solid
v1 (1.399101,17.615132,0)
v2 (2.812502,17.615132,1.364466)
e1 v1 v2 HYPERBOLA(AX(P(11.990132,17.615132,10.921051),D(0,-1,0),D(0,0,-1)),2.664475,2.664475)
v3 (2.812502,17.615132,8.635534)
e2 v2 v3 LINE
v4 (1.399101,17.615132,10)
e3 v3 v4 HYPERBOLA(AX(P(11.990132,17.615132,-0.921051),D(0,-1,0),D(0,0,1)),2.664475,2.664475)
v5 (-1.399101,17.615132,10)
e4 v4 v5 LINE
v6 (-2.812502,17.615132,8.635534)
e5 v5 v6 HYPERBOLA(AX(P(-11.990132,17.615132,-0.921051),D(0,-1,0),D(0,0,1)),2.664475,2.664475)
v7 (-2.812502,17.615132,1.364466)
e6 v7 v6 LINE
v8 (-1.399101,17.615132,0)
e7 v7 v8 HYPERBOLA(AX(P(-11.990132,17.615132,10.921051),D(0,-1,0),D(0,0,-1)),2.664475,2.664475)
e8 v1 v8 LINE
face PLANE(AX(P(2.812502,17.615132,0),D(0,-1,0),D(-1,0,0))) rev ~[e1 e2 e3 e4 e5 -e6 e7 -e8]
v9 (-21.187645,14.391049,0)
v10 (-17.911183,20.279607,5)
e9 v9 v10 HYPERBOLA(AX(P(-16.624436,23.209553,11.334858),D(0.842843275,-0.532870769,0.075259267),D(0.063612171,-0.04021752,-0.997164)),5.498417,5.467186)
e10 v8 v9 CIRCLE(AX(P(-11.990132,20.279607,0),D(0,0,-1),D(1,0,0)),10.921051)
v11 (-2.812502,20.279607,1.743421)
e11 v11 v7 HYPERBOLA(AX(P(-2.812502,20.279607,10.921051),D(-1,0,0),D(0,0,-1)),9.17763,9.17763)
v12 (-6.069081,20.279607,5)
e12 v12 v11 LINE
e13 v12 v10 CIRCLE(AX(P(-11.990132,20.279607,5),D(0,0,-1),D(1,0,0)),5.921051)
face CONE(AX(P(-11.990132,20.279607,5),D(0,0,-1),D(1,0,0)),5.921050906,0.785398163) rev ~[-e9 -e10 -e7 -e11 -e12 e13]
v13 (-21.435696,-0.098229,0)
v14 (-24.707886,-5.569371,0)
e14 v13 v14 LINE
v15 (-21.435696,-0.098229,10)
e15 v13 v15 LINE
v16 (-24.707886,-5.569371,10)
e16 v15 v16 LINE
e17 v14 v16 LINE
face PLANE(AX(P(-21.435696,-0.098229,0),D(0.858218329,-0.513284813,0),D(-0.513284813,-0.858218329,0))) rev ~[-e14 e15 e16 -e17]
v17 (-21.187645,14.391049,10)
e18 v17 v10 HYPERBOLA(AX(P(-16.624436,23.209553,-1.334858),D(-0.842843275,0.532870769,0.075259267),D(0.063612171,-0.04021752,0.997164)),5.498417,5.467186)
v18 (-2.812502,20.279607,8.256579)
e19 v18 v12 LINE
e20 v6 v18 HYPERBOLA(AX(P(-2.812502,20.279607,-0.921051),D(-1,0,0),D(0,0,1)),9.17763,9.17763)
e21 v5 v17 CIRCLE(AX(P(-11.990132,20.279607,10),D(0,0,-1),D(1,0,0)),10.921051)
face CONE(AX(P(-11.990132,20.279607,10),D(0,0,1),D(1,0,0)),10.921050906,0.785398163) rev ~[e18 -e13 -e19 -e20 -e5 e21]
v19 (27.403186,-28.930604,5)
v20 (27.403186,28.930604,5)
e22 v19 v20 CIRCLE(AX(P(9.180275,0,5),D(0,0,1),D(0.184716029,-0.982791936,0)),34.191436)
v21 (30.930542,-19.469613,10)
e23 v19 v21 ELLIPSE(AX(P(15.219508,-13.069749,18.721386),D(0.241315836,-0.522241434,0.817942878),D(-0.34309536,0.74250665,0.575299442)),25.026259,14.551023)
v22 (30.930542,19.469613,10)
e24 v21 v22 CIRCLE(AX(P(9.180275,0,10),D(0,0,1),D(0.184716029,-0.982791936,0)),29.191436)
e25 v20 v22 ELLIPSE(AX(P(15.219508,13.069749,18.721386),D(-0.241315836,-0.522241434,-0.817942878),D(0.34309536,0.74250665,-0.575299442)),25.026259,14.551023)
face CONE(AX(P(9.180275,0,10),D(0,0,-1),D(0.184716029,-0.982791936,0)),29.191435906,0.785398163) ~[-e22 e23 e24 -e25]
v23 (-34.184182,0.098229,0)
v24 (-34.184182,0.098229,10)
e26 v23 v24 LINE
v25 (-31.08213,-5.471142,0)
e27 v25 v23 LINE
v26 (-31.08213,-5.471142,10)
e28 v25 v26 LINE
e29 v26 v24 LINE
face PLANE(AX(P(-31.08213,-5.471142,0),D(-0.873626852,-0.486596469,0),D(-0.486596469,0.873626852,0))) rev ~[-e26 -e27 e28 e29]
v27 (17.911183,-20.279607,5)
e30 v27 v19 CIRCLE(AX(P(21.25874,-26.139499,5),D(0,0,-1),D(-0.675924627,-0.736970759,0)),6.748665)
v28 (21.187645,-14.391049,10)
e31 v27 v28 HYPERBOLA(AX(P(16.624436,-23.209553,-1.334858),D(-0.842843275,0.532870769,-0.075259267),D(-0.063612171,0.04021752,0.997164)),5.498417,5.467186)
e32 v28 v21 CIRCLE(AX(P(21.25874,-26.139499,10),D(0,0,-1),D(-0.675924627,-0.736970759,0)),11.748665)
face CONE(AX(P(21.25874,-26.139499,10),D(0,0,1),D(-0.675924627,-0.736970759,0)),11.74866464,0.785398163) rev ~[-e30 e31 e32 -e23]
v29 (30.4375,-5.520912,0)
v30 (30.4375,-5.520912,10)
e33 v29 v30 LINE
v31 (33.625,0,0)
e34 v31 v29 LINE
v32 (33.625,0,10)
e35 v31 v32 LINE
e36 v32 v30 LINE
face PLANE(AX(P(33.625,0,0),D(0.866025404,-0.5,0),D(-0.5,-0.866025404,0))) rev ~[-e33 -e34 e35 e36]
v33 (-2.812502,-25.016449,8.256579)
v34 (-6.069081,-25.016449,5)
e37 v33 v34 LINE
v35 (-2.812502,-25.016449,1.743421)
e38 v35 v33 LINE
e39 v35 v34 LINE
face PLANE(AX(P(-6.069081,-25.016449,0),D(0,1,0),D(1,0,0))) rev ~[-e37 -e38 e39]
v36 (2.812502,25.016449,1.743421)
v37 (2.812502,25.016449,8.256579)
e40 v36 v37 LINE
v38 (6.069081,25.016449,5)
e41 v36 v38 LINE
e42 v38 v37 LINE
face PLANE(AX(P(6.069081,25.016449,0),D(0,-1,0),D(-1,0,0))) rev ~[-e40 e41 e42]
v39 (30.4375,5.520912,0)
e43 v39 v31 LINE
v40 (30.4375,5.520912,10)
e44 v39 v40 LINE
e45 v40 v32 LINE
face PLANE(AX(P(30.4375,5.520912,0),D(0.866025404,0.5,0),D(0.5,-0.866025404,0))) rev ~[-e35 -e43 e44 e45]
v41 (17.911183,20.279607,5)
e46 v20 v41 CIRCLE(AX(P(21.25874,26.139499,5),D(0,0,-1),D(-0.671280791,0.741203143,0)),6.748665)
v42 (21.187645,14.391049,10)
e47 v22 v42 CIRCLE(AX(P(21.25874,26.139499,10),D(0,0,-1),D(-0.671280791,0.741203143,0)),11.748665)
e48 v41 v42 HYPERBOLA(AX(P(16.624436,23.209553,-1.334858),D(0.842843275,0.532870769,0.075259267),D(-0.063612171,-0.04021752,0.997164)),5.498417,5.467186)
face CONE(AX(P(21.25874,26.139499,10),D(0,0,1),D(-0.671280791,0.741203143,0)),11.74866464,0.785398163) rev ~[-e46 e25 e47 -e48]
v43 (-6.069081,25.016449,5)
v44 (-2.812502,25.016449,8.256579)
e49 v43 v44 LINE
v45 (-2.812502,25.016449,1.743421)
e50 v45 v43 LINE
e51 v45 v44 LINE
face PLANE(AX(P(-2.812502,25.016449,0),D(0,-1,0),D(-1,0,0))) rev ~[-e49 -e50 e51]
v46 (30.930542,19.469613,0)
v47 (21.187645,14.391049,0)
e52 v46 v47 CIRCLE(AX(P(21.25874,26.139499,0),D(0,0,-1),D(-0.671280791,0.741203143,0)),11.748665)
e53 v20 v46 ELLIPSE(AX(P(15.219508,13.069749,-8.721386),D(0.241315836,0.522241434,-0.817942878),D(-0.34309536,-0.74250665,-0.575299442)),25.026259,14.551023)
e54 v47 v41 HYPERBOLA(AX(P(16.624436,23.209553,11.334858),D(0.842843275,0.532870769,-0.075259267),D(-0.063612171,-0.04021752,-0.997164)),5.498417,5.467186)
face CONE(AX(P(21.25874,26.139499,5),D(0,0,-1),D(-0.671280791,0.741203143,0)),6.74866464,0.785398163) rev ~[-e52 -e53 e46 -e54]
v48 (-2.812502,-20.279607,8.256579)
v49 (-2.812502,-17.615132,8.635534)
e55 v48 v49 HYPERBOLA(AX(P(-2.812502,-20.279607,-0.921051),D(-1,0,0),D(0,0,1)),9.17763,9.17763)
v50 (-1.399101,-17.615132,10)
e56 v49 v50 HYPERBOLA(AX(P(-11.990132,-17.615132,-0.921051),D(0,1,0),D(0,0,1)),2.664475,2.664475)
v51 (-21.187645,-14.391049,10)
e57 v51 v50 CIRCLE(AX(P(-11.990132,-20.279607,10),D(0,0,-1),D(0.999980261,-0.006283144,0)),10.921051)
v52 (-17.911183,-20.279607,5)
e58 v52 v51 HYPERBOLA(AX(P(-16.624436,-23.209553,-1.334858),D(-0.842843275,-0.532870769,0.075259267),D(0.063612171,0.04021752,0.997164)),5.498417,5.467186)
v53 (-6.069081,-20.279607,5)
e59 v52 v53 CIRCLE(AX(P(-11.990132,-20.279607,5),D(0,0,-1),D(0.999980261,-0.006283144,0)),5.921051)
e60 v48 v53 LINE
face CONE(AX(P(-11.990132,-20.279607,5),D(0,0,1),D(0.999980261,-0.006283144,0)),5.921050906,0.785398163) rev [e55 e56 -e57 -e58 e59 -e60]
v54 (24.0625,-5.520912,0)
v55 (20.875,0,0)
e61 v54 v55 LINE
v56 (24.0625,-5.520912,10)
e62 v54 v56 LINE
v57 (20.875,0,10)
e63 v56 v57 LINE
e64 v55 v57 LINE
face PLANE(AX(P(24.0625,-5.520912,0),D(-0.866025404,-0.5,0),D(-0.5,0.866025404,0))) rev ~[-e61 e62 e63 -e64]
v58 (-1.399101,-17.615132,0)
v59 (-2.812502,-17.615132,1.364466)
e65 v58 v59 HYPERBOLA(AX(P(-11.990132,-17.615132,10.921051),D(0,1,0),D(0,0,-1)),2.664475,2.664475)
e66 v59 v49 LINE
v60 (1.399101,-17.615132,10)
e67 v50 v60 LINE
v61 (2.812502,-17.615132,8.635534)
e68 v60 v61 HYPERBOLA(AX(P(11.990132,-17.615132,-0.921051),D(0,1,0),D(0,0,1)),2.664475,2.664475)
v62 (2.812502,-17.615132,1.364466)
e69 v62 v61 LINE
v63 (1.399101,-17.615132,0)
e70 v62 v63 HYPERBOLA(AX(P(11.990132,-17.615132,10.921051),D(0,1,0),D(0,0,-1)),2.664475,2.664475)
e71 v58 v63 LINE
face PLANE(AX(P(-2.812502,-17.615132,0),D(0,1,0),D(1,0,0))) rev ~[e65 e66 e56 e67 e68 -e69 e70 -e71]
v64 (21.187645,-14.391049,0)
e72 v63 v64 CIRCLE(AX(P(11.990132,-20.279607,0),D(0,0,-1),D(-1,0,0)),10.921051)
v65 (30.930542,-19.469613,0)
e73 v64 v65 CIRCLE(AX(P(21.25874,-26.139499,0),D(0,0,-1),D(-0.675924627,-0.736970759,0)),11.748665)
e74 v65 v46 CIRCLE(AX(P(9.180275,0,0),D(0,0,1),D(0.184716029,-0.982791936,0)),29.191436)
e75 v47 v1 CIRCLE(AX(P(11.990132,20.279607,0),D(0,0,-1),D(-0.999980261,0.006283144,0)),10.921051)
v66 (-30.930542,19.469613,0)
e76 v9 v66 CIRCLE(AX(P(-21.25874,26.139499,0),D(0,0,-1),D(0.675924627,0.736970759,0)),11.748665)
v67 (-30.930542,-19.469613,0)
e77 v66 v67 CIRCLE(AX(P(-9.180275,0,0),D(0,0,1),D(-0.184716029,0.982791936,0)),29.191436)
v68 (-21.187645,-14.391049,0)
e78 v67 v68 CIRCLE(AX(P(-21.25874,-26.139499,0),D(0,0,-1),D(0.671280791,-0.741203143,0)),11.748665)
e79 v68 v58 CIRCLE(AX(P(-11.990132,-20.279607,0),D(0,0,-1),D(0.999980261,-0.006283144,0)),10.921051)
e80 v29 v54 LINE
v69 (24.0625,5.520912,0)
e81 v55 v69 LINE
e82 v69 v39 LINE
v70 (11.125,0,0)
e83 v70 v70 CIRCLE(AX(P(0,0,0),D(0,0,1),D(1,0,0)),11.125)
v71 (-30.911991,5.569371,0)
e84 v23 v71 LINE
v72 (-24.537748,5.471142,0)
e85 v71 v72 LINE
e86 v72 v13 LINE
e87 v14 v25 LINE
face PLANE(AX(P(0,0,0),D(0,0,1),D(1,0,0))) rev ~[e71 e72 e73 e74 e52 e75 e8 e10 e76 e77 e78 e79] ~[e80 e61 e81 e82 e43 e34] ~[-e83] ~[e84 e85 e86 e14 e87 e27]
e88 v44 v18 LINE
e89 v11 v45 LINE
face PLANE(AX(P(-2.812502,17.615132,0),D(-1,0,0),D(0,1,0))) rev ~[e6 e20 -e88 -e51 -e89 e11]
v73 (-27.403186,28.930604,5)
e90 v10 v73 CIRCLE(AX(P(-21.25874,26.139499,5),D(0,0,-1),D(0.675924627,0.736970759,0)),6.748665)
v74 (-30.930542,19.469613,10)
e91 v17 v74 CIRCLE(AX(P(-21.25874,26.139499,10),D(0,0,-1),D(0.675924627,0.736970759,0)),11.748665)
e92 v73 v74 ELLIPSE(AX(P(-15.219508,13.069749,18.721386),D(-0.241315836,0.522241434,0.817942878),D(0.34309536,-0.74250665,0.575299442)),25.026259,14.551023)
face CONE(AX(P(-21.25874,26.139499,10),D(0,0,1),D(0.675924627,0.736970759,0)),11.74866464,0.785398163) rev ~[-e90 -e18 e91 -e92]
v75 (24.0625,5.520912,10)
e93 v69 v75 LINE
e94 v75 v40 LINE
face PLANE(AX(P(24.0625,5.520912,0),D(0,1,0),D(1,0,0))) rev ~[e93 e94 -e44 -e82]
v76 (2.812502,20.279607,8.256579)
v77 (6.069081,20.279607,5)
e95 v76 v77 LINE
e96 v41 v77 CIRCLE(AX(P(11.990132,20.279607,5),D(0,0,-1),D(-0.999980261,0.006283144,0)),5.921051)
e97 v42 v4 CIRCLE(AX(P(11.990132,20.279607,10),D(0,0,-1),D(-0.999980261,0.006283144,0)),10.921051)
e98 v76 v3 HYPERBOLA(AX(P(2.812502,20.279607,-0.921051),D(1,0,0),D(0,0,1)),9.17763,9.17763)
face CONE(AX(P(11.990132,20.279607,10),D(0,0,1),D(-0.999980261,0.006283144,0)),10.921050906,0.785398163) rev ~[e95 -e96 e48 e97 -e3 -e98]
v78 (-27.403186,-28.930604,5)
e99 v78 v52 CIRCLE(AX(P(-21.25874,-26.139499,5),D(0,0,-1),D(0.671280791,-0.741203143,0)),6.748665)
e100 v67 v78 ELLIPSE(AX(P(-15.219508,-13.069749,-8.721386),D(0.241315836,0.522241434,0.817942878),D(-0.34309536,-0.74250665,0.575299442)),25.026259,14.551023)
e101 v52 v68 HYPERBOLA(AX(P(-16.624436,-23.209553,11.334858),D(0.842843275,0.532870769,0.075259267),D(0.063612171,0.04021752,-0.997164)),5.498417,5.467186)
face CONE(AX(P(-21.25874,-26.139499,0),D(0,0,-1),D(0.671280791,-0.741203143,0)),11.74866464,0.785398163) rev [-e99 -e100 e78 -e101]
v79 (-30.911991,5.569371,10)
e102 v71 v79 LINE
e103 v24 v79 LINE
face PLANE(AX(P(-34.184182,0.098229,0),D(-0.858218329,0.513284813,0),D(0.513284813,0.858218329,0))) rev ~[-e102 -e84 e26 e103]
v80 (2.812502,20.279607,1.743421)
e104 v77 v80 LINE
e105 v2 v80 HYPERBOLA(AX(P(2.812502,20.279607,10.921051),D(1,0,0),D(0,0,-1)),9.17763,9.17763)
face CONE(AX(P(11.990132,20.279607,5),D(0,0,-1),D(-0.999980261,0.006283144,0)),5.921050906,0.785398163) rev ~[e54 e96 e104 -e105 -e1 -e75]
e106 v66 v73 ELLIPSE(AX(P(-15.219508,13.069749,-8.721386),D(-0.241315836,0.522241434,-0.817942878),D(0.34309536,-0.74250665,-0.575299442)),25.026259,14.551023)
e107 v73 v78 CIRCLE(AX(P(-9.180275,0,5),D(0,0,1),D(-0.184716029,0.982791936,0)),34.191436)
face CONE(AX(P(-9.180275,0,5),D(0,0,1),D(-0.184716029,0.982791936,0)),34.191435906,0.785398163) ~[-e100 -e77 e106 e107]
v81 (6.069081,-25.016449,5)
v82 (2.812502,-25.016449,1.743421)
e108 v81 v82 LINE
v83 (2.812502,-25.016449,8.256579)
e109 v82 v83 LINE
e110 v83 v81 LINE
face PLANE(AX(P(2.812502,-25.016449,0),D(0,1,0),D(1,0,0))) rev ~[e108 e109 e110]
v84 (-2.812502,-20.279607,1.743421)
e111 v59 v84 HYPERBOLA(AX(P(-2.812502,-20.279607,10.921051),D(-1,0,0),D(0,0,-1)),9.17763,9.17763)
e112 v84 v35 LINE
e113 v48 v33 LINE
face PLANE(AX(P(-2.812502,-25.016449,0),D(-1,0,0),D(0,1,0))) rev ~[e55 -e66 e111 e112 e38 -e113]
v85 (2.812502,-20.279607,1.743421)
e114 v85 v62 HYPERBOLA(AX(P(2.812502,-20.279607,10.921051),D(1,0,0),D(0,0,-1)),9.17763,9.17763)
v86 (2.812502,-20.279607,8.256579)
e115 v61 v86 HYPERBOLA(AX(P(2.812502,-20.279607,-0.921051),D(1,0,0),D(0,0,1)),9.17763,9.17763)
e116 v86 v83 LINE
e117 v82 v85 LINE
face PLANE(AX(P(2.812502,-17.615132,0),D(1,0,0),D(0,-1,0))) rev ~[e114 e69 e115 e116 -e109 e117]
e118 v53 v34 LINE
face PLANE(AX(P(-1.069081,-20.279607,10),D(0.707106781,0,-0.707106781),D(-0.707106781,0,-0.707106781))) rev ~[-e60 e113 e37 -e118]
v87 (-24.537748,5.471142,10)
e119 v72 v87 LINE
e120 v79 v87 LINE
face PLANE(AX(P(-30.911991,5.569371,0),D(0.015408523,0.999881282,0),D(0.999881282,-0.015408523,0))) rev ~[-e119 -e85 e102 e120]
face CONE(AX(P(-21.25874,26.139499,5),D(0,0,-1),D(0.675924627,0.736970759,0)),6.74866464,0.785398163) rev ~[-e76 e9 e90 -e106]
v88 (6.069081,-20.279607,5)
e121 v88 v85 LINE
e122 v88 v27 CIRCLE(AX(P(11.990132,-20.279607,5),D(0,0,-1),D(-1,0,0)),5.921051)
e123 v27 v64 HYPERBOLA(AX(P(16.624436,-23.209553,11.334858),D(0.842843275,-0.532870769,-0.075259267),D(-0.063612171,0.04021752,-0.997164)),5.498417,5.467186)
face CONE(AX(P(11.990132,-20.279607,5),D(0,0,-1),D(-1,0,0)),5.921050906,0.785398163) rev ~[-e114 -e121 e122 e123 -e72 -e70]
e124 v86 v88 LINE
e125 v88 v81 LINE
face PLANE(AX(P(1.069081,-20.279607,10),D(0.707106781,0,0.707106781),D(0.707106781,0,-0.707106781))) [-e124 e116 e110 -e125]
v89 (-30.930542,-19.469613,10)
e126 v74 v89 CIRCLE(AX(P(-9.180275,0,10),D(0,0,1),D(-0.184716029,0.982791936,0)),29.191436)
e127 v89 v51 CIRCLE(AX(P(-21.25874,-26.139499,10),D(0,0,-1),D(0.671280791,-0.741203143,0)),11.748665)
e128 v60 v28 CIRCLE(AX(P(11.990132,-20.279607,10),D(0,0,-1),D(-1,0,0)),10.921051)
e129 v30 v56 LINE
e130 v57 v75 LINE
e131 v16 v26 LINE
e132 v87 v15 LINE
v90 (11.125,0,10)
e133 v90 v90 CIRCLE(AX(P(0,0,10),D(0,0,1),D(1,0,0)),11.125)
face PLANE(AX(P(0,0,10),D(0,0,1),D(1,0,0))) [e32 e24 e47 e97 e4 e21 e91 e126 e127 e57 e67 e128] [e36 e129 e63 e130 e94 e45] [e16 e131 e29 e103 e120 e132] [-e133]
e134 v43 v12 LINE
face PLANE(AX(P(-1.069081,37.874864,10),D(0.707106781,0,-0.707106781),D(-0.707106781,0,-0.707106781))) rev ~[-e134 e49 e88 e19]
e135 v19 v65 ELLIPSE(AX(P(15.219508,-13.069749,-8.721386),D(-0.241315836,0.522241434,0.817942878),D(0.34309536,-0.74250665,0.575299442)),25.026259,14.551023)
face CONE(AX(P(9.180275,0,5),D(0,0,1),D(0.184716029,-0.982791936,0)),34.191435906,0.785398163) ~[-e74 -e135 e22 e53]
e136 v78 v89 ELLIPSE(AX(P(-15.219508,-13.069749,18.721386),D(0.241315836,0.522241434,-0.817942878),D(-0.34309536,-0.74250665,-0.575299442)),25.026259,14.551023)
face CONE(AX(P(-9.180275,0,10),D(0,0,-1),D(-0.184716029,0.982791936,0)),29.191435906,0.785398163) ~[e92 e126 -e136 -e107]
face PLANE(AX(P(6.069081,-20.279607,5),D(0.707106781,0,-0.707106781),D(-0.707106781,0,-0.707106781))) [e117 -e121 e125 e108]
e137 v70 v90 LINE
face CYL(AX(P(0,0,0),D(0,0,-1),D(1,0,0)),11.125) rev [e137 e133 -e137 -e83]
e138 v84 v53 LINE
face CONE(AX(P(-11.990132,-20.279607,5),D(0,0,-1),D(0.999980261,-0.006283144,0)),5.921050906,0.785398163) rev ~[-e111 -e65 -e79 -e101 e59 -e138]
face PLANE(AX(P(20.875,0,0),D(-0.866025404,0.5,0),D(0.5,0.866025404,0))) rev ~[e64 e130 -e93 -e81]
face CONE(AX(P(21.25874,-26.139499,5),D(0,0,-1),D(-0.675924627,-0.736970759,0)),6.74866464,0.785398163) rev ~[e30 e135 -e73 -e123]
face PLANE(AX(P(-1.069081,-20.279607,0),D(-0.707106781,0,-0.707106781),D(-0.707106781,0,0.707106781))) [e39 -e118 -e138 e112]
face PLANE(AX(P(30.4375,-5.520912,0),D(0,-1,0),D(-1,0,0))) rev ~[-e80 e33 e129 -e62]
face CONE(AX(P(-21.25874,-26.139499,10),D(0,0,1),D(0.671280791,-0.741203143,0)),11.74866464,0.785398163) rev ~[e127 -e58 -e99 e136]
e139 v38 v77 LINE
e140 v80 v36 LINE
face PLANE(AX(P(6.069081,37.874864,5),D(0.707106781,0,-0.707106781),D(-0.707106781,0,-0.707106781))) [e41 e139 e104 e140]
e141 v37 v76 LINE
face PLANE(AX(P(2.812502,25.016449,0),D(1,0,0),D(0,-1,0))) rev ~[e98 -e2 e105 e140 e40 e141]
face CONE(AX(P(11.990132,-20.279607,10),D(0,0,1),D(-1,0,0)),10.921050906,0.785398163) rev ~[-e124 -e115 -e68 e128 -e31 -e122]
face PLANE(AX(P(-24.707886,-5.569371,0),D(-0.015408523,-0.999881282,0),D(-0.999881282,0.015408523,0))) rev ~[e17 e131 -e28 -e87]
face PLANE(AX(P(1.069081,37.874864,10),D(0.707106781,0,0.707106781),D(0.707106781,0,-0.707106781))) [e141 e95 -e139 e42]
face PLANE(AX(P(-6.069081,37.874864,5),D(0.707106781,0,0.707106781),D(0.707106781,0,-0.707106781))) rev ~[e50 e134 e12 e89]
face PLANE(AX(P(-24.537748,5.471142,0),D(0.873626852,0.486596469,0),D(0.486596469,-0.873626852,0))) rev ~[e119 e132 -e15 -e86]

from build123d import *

# Parameters (mm, degrees)
F0_R         = 11.125
F1_DEPTH     = 10
F2_T1_DEPTH  = 17.5952575274
F2_T3_DEPTH  = 17.5952575274
F2_T6_ANGLE  = 359.64
F2_T8_ANGLE  = 359.64
F2_T10_ANGLE = 158.7108465942
F2_T12_ANGLE = 359.64
F2_T14_ANGLE = 359.64
F2_T16_ANGLE = 359.64
F2_T18_ANGLE = 359.64
F2_T20_ANGLE = 158.7108465942
F2_T22_ANGLE = 359.64
F2_T24_ANGLE = 359.64
F2_T26_ANGLE = 359.64
F2_T28_ANGLE = 158.7108465942
F2_T30_ANGLE = 359.64
F2_T32_ANGLE = 359.64
F2_T34_ANGLE = 359.64
F2_T36_ANGLE = 359.64
F2_T38_ANGLE = 359.64
F2_T40_ANGLE = 359.64
F2_T42_ANGLE = 158.7108465942
F2_T44_ANGLE = 359.64


# Not quite as in the source:
# - a fillet or chamfer that OpenCascade refuses, or shapes differently, is made with other operations: its cross-section is extruded or revolved along the edge and cut away or added


with BuildPart() as f1:
    # F0 (on Top) → F1 (new body)
    with BuildSketch(Plane.XY):
        with BuildLine():
            Line((-2.8125022072, -17.6151320338), (0, -17.6151320338))
            Line((0, -17.6151320338), (2.8125022072, -17.6151320338))
            Line((2.8125022072, -17.6151320338), (2.8125022072, -25.0164493918))
            Line((2.8125022072, -25.0164493918), (6.0690809041, -25.0164493918))
            Line((6.0690809041, -25.0164493918), (6.0690809041, -20.2796068043))
            ThreePointArc((6.0690809041, -20.2796068043), (11.9901318103, -14.3585558981), (17.9111827165, -20.2796068043))
            ThreePointArc((17.9111827165, -20.2796068043), (25.8046814323, -21.1516241303), (27.4031855301, -28.930603552))
            ThreePointArc((27.4031855301, -28.930603552), (43.3717109263, 0), (27.4031855301, 28.930603552))
            ThreePointArc((27.4031855301, 28.930603552), (25.8046814323, 21.1516241303), (17.9111827165, 20.2796068043))
            ThreePointArc((17.9111827165, 20.2796068043), (11.9901318103, 14.3585558981), (6.0690809041, 20.2796068043))
            Line((6.0690809041, 20.2796068043), (6.0690809041, 25.0164493918))
            Line((6.0690809041, 25.0164493918), (2.8125022072, 25.0164493918))
            Line((2.8125022072, 25.0164493918), (2.8125022072, 17.6151320338))
            Line((2.8125022072, 17.6151320338), (0, 17.6151320338))
            Line((0, 17.6151320338), (-2.8125022072, 17.6151320338))
            Line((-2.8125022072, 17.6151320338), (-2.8125022072, 25.0164493918))
            Line((-2.8125022072, 25.0164493918), (-6.0690809041, 25.0164493918))
            Line((-6.0690809041, 25.0164493918), (-6.0690809041, 20.2796068043))
            ThreePointArc((-6.0690809041, 20.2796068043), (-11.9901318103, 14.3585558981), (-17.9111827165, 20.2796068043))
            ThreePointArc((-17.9111827165, 20.2796068043), (-25.8046814323, 21.1516241303), (-27.4031855301, 28.930603552))
            ThreePointArc((-27.4031855301, 28.930603552), (-43.3717109263, 0), (-27.4031855301, -28.930603552))
            ThreePointArc((-27.4031855301, -28.930603552), (-25.8046814323, -21.1516241303), (-17.9111827165, -20.2796068043))
            ThreePointArc((-17.9111827165, -20.2796068043), (-11.9901318103, -14.3585558981), (-6.0690809041, -20.2796068043))
            Line((-6.0690809041, -20.2796068043), (-6.0690809041, -25.0164493918))
            Line((-6.0690809041, -25.0164493918), (-2.8125022072, -25.0164493918))
            Line((-2.8125022072, -25.0164493918), (-2.8125022072, -17.6151320338))
        make_face()
        Polygon((-30.9119913686, 5.5693711821), (-24.537748198, 5.4711418492), (-21.4356957103, -0.0982293328), (-24.7078863932, -5.5693711821), (-31.0821295639, -5.4711418492), (-34.1841820515, 0.0982293328), align=None, mode=Mode.SUBTRACT)
        Circle(F0_R, mode=Mode.SUBTRACT)
        Polygon((20.875, 0), (24.0625, 5.5209119491), (30.4375, 5.5209119491), (33.625, 0), (30.4375, -5.5209119491), (24.0625, -5.5209119491), align=None, mode=Mode.SUBTRACT)
    extrude(amount=F1_DEPTH)

    # F2: chamfer of 5 on 20 edges, made by hand

    # F2_s2 → F2_t1 (cut)
    with BuildSketch(Plane.XZ.offset(-37.8748643317)):
        Polygon((-6.0690809041, 5), (-1.0690809041, 0), (-6.0690809041, 0), align=None)
        Polygon((6.0690809041, 5), (1.0690809041, 0), (6.0690809041, 0), align=None)
        Polygon((1.0690809041, 10), (6.0690809041, 5), (6.0690809041, 10), align=None)
        Polygon((-1.0690809041, 10), (-6.0690809041, 5), (-6.0690809041, 10), align=None)
    extrude(amount=F2_T1_DEPTH, mode=Mode.SUBTRACT)

    # F2_s4 → F2_t3 (cut)
    with BuildSketch(Plane.XZ.offset(20.2796068043)):
        Polygon((-1.0690809041, 0), (-6.0690809041, 5), (-6.0690809041, 0), align=None)
        Polygon((6.0690809041, 5), (1.0690809041, 0), (6.0690809041, 0), align=None)
        Polygon((1.0690809041, 10), (6.0690809041, 5), (6.0690809041, 10), align=None)
        Polygon((-1.0690809041, 10), (-6.0690809041, 5), (-6.0690809041, 10), align=None)
    extrude(amount=F2_T3_DEPTH, mode=Mode.SUBTRACT)

    # F2_s5 → F2_t6 (revolve, cut)
    with BuildSketch(Plane(origin=(-24.5672156268, 22.5322183518, 0), x_dir=(0, 0, 1), z_dir=(-0.7369707586, 0.6759246267, 0))):
        Polygon((10, 16.6434047939), (5, 11.6434047939), (10, 11.6434047939), align=None)
    revolve(axis=Axis((-21.2587402157, 26.1394987159, 10), (0, 0, -1)), revolution_arc=F2_T6_ANGLE, mode=Mode.SUBTRACT)

    # F2_s7 → F2_t8 (revolve, cut)
    with BuildSketch(Plane.XZ.offset(-20.2796068043)):
        Polygon((-1.0690809041, 10), (-6.0690809041, 5), (-6.0690809041, 10), align=None)
    revolve(axis=Axis((-11.9901318103, 20.2796068043, 10), (0, 0, -1)), revolution_arc=F2_T8_ANGLE, mode=Mode.SUBTRACT)

    # F2_s9 → F2_t10 (revolve, cut)
    with BuildSketch(Plane(origin=(-8.8670439331, -1.6665634724, 0), x_dir=(0, 0, 1), z_dir=(0.9827919356, 0.1847160286, 0))):
        Polygon((10, -30.8871798498), (5, -35.8871798498), (10, -35.8871798498), align=None)
    revolve(axis=Axis((-9.1802750199, 0, 10), (0, 0, 1)), revolution_arc=F2_T10_ANGLE, mode=Mode.SUBTRACT)

    # F2_s11 → F2_t12 (revolve, cut)
    with BuildSketch(Plane(origin=(-24.6850209159, -22.3563277123, 0), x_dir=(0, 0, 1), z_dir=(0.7412031432, 0.6712807911, 0))):
        Polygon((10, 16.8527592984), (5, 11.8527592984), (10, 11.8527592984), align=None)
    revolve(axis=Axis((-21.2587402157, -26.1394987159, 10), (0, 0, -1)), revolution_arc=F2_T12_ANGLE, mode=Mode.SUBTRACT)

    # F2_s13 → F2_t14 (revolve, cut)
    with BuildSketch(Plane(origin=(-0.1278905192, -20.3541404453, 0), x_dir=(0, 0, 1), z_dir=(0.006283144, 0.9999802609, 0))):
        Polygon((5, -5.9414245401), (10, -0.9414245401), (10, -5.9414245401), align=None)
    revolve(axis=Axis((-11.9901318103, -20.2796068043, 10), (0, 0, -1)), revolution_arc=F2_T14_ANGLE, mode=Mode.SUBTRACT)

    # F2_s15 → F2_t16 (revolve, cut)
    with BuildSketch(Plane.XZ.offset(20.2796068043)):
        Polygon((1.0690809041, 10), (6.0690809041, 5), (6.0690809041, 10), align=None)
    revolve(axis=Axis((11.9901318103, -20.2796068043, 10), (0, 0, -1)), revolution_arc=F2_T16_ANGLE, mode=Mode.SUBTRACT)

    # F2_s17 → F2_t18 (revolve, cut)
    with BuildSketch(Plane(origin=(24.5672156268, -22.5322183518, 0), x_dir=(0, 0, 1), z_dir=(0.7369707586, -0.6759246267, 0))):
        Polygon((10, 16.6434047939), (5, 11.6434047939), (10, 11.6434047939), align=None)
    revolve(axis=Axis((21.2587402157, -26.1394987159, 10), (0, 0, -1)), revolution_arc=F2_T18_ANGLE, mode=Mode.SUBTRACT)

    # F2_s19 → F2_t20 (revolve, cut)
    with BuildSketch(Plane(origin=(8.8670439331, 1.6665634724, 0), x_dir=(0, 0, 1), z_dir=(-0.9827919356, -0.1847160286, 0))):
        Polygon((10, -30.8871798498), (5, -35.8871798498), (10, -35.8871798498), align=None)
    revolve(axis=Axis((9.1802750199, 0, 10), (0, 0, 1)), revolution_arc=F2_T20_ANGLE, mode=Mode.SUBTRACT)

    # F2_s21 → F2_t22 (revolve, cut)
    with BuildSketch(Plane(origin=(24.6850209159, 22.3563277123, 0), x_dir=(0, 0, 1), z_dir=(-0.7412031432, -0.6712807911, 0))):
        Polygon((10, 16.8527592984), (5, 11.8527592984), (10, 11.8527592984), align=None)
    revolve(axis=Axis((21.2587402157, 26.1394987159, 10), (0, 0, -1)), revolution_arc=F2_T22_ANGLE, mode=Mode.SUBTRACT)

    # F2_s23 → F2_t24 (revolve, cut)
    with BuildSketch(Plane(origin=(0.1278905192, 20.3541404453, 0), x_dir=(0, 0, 1), z_dir=(-0.006283144, -0.9999802609, 0))):
        Polygon((10, -0.9414245401), (5, -5.9414245401), (10, -5.9414245401), align=None)
    revolve(axis=Axis((11.9901318103, 20.2796068043, 10), (0, 0, -1)), revolution_arc=F2_T24_ANGLE, mode=Mode.SUBTRACT)

    # F2_s25 → F2_t26 (revolve, cut)
    with BuildSketch(Plane(origin=(24.6850209159, 22.3563277123, 0), x_dir=(0, 0, 1), z_dir=(-0.7412031432, -0.6712807911, 0))):
        Polygon((5, 11.8527592984), (0, 16.8527592984), (0, 11.8527592984), align=None)
    revolve(axis=Axis((21.2587402157, 26.1394987159, 0), (0, 0, -1)), revolution_arc=F2_T26_ANGLE, mode=Mode.SUBTRACT)

    # F2_s27 → F2_t28 (revolve, cut)
    with BuildSketch(Plane(origin=(8.8670439331, 1.6665634724, 0), x_dir=(0, 0, 1), z_dir=(-0.9827919356, -0.1847160286, 0))):
        Polygon((5, -35.8871798498), (0, -30.8871798498), (0, -35.8871798498), align=None)
    revolve(axis=Axis((9.1802750199, 0, 0), (0, 0, 1)), revolution_arc=F2_T28_ANGLE, mode=Mode.SUBTRACT)

    # F2_s29 → F2_t30 (revolve, cut)
    with BuildSketch(Plane(origin=(24.5672156268, -22.5322183518, 0), x_dir=(0, 0, 1), z_dir=(0.7369707586, -0.6759246267, 0))):
        Polygon((5, 11.6434047939), (0, 16.6434047939), (0, 11.6434047939), align=None)
    revolve(axis=Axis((21.2587402157, -26.1394987159, 0), (0, 0, -1)), revolution_arc=F2_T30_ANGLE, mode=Mode.SUBTRACT)

    # F2_s31 → F2_t32 (revolve, cut)
    with BuildSketch(Plane.XZ.offset(20.2796068043)):
        Polygon((6.0690809041, 5), (1.0690809041, 0), (6.0690809041, 0), align=None)
    revolve(axis=Axis((11.9901318103, -20.2796068043, 0), (0, 0, -1)), revolution_arc=F2_T32_ANGLE, mode=Mode.SUBTRACT)

    # F2_s33 → F2_t34 (revolve, cut)
    with BuildSketch(Plane(origin=(-0.1278905192, -20.3541404453, 0), x_dir=(0, 0, 1), z_dir=(0.006283144, 0.9999802609, 0))):
        Polygon((5, -5.9414245401), (0, -0.9414245401), (0, -5.9414245401), align=None)
    revolve(axis=Axis((-11.9901318103, -20.2796068043, 0), (0, 0, -1)), revolution_arc=F2_T34_ANGLE, mode=Mode.SUBTRACT)

    # F2_s35 → F2_t36 (revolve, cut)
    with BuildSketch(Plane(origin=(0.1278905192, 20.3541404453, 0), x_dir=(0, 0, 1), z_dir=(-0.006283144, -0.9999802609, 0))):
        Polygon((5, -5.9414245401), (0, -0.9414245401), (0, -5.9414245401), align=None)
    revolve(axis=Axis((11.9901318103, 20.2796068043, 0), (0, 0, -1)), revolution_arc=F2_T36_ANGLE, mode=Mode.SUBTRACT)

    # F2_s37 → F2_t38 (revolve, cut)
    with BuildSketch(Plane.XZ.offset(-20.2796068043)):
        Polygon((-6.0690809041, 5), (-1.0690809041, 0), (-6.0690809041, 0), align=None)
    revolve(axis=Axis((-11.9901318103, 20.2796068043, 0), (0, 0, -1)), revolution_arc=F2_T38_ANGLE, mode=Mode.SUBTRACT)

    # F2_s39 → F2_t40 (revolve, cut)
    with BuildSketch(Plane(origin=(-24.5672156268, 22.5322183518, 0), x_dir=(0, 0, 1), z_dir=(-0.7369707586, 0.6759246267, 0))):
        Polygon((5, 11.6434047939), (0, 16.6434047939), (0, 11.6434047939), align=None)
    revolve(axis=Axis((-21.2587402157, 26.1394987159, 0), (0, 0, -1)), revolution_arc=F2_T40_ANGLE, mode=Mode.SUBTRACT)

    # F2_s41 → F2_t42 (revolve, cut)
    with BuildSketch(Plane(origin=(-8.8670439331, -1.6665634724, 0), x_dir=(0, 0, 1), z_dir=(0.9827919356, 0.1847160286, 0))):
        Polygon((5, -35.8871798498), (0, -30.8871798498), (0, -35.8871798498), align=None)
    revolve(axis=Axis((-9.1802750199, 0, 0), (0, 0, 1)), revolution_arc=F2_T42_ANGLE, mode=Mode.SUBTRACT)

    # F2_s43 → F2_t44 (revolve, cut)
    with BuildSketch(Plane(origin=(-24.6850209159, -22.3563277123, 0), x_dir=(0, 0, 1), z_dir=(0.7412031432, 0.6712807911, 0))):
        Polygon((0, 16.8527592984), (5, 11.8527592984), (0, 11.8527592984), align=None)
    revolve(axis=Axis((-21.2587402157, -26.1394987159, 0), (0, 0, -1)), revolution_arc=F2_T44_ANGLE, mode=Mode.SUBTRACT)


solid = f1.part
